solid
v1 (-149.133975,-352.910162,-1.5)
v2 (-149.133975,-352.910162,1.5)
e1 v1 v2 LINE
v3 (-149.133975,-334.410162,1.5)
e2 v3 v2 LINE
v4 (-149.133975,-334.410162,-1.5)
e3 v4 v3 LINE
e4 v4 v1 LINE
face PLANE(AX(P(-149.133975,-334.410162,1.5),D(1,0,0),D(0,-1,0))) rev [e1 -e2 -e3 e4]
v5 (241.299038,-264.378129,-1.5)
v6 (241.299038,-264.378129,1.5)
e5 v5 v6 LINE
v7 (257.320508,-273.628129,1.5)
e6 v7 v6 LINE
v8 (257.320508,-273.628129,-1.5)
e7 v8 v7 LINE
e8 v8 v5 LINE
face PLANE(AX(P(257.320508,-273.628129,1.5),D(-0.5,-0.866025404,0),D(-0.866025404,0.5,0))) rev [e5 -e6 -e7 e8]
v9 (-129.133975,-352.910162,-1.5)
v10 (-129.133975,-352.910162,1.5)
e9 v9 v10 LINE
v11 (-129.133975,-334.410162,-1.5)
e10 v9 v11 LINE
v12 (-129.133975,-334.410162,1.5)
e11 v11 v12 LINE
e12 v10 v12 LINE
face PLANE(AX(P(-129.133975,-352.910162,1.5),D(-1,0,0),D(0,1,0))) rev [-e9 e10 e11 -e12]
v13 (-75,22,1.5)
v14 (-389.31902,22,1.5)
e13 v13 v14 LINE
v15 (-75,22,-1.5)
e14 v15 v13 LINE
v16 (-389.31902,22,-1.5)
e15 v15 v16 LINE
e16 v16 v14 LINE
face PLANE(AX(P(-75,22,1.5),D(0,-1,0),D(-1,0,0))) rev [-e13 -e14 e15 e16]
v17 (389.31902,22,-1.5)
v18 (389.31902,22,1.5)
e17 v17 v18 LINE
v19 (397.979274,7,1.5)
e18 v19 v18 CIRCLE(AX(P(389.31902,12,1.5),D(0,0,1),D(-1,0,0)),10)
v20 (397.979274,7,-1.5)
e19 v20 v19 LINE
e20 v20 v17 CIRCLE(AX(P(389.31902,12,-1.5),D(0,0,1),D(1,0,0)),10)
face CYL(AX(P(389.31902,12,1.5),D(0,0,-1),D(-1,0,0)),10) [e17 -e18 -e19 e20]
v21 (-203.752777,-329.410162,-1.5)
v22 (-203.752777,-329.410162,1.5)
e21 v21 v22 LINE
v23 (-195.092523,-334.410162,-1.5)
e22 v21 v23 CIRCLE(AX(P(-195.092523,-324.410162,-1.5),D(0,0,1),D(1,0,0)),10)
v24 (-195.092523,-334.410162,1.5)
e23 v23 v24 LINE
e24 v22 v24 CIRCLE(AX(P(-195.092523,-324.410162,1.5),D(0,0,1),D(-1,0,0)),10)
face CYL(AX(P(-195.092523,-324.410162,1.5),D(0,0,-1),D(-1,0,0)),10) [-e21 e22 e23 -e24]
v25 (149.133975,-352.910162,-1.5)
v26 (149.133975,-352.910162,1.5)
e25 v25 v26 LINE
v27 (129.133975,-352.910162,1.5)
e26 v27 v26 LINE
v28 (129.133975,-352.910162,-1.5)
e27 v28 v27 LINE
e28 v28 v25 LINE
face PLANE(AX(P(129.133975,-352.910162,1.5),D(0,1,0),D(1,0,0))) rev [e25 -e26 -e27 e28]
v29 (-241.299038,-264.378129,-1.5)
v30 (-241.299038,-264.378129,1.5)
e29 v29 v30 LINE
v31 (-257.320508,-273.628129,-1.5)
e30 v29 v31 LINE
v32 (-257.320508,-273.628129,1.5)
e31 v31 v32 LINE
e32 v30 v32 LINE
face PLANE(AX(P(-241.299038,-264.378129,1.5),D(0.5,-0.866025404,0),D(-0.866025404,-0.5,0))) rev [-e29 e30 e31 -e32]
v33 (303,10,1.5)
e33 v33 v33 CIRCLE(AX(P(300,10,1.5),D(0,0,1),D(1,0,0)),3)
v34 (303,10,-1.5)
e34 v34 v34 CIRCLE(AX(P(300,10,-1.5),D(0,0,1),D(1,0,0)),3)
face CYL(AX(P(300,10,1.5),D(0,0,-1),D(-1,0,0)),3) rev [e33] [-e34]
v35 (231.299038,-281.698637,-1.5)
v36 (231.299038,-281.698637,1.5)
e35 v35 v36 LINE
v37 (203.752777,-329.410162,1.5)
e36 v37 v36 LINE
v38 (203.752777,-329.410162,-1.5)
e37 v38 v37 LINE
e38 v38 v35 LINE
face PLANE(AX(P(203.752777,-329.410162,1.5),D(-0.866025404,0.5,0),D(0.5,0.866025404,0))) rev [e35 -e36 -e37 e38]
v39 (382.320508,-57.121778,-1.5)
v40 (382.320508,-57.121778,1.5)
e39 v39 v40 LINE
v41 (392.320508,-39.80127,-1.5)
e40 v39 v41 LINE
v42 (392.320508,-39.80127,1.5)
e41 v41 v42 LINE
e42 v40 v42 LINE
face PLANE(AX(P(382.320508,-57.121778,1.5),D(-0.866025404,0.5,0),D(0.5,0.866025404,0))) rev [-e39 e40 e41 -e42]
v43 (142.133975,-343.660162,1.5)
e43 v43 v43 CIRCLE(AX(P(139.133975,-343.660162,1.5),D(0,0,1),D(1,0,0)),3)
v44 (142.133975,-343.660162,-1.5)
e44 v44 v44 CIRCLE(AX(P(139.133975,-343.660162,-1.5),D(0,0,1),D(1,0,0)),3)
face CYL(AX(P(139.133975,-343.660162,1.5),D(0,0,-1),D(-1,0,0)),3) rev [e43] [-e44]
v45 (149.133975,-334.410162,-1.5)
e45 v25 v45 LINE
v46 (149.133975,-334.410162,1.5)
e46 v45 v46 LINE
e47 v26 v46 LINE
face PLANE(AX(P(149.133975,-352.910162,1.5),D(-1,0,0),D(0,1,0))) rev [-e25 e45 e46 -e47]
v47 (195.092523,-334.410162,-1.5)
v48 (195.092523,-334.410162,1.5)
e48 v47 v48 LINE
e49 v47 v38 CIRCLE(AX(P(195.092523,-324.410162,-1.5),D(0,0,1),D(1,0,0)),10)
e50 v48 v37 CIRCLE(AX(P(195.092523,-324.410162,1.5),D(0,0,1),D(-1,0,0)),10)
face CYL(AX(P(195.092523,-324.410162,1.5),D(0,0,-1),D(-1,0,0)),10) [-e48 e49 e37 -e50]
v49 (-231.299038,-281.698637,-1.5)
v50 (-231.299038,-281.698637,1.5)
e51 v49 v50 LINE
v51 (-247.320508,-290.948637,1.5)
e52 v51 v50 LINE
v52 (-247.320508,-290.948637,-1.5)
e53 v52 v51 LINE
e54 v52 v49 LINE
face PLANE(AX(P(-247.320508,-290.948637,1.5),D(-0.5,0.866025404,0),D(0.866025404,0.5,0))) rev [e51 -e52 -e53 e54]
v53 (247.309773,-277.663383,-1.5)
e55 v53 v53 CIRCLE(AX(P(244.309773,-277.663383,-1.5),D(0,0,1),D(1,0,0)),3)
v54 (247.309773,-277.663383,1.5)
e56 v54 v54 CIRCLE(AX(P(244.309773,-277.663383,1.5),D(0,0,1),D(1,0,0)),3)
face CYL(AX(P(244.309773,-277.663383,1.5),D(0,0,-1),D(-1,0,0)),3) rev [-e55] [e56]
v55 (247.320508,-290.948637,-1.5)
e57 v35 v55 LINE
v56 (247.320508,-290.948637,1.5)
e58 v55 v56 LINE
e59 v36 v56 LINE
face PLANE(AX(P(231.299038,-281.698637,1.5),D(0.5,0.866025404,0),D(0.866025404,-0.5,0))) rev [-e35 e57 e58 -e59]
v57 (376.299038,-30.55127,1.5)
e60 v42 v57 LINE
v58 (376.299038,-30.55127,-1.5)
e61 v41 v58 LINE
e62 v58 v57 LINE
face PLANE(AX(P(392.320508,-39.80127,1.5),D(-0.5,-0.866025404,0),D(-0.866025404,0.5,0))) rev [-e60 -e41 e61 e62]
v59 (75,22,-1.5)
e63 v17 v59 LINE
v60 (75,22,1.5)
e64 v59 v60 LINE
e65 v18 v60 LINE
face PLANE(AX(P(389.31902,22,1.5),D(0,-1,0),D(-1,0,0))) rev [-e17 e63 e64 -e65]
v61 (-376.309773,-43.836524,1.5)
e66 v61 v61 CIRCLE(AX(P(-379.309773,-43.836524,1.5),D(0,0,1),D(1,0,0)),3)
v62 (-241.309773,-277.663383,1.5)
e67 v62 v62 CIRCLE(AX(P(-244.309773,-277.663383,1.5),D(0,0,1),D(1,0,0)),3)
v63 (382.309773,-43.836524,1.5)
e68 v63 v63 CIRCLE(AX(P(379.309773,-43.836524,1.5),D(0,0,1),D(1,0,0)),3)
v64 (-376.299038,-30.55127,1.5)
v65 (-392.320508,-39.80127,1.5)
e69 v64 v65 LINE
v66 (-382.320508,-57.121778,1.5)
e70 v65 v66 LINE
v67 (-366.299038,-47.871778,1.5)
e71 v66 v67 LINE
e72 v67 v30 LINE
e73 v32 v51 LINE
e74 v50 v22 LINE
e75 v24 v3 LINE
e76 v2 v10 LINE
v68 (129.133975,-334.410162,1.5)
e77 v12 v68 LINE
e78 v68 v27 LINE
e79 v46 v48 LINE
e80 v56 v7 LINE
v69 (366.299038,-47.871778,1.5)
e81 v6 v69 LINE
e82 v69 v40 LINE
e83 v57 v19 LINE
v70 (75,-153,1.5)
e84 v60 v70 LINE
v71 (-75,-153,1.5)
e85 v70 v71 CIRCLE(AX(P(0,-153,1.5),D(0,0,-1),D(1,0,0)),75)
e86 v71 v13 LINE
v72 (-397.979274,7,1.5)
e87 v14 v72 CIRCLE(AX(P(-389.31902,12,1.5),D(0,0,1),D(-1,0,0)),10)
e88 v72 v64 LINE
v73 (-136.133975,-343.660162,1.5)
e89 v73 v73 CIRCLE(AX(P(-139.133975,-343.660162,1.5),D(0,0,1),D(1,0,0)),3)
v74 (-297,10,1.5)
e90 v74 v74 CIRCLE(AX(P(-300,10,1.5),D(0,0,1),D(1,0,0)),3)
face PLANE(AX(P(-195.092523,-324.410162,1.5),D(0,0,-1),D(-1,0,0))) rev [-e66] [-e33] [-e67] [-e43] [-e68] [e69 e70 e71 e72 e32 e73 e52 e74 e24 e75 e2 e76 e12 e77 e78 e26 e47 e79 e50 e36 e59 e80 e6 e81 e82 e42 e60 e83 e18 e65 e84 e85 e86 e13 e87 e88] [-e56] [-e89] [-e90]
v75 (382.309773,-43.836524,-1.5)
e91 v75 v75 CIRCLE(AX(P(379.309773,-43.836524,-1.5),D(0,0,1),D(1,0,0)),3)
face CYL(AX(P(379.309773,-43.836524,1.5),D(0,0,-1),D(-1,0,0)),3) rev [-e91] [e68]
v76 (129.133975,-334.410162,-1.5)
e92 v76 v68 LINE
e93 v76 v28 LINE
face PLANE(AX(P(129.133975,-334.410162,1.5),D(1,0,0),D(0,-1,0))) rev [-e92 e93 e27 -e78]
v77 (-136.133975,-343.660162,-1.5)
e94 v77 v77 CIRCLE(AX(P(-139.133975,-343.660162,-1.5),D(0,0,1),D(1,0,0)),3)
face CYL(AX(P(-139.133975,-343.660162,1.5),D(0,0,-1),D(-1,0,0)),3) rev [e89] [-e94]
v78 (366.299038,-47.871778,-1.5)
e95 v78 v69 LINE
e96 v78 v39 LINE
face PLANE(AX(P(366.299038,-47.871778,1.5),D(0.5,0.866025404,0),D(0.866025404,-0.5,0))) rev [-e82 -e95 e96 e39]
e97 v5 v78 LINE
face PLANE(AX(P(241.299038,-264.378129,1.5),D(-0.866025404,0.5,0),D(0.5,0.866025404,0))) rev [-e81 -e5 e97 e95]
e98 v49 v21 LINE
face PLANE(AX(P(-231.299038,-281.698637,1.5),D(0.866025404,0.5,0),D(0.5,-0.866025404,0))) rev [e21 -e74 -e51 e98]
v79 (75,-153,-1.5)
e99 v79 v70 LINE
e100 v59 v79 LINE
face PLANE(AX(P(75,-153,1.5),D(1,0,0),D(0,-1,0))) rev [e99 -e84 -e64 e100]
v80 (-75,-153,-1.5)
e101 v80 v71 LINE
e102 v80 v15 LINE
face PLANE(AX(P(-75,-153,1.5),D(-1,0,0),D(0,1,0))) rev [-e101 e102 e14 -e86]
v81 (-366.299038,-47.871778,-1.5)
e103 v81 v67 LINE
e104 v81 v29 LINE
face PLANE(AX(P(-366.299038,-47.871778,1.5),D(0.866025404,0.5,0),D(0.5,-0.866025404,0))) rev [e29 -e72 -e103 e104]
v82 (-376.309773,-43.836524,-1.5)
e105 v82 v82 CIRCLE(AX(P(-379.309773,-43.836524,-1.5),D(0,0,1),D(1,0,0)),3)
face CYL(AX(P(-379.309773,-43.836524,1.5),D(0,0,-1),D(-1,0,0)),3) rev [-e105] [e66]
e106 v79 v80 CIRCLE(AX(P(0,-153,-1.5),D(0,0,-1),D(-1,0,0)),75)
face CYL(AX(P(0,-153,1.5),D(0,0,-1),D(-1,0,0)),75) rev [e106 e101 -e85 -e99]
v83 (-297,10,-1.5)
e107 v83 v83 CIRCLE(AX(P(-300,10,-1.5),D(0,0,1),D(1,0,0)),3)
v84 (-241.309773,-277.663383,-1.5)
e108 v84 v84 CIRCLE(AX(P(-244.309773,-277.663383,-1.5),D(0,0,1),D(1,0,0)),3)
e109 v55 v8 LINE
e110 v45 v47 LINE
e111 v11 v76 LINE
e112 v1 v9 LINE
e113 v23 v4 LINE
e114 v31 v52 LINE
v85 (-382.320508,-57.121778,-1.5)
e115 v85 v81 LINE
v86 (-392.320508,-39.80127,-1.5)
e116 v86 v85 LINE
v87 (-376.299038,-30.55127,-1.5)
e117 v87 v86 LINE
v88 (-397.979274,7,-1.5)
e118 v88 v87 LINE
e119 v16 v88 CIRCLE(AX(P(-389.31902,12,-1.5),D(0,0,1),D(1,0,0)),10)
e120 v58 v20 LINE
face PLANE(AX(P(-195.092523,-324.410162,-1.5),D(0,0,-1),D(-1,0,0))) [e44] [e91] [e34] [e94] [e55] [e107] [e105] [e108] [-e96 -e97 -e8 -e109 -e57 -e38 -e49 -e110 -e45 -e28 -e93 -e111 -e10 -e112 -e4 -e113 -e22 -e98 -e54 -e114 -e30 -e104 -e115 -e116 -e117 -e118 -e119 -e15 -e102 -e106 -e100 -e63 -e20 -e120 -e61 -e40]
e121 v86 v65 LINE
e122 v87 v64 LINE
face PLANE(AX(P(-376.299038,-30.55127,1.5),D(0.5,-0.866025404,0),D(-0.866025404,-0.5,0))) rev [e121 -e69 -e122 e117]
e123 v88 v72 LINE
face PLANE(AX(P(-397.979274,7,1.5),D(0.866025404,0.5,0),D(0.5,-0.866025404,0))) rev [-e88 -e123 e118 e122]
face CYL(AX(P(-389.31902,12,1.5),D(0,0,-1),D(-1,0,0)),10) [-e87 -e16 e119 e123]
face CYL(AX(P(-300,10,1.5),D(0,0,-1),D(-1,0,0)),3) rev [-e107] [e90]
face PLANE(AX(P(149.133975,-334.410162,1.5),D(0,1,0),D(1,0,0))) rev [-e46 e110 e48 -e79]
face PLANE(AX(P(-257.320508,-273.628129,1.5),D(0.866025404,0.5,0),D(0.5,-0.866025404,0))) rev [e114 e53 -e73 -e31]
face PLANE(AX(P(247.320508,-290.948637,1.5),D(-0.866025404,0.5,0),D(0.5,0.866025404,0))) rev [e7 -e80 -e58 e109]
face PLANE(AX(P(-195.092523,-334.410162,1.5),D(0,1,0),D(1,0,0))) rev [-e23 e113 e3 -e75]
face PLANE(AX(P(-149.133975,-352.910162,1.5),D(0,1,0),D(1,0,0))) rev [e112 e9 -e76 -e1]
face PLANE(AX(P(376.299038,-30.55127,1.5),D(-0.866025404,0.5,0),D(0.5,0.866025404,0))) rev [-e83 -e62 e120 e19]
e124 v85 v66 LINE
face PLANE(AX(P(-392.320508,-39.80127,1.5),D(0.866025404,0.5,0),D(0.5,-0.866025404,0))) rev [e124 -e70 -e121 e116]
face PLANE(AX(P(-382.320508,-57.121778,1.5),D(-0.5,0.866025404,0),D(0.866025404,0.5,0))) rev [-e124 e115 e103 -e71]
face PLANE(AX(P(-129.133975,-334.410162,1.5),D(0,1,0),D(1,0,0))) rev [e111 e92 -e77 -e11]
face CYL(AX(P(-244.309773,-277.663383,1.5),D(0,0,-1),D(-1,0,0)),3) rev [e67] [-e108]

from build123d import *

# Parameters (mm, degrees)
SKETCH_1_R              = 3
EXTRUDE_1_DEPTH         = 1.5
SHEET_START             = -1.5
SHEET_METAL_1_OUTLINE_R = 3
SHEET_METAL_1_DEPTH     = 1.5


# Read off the part's stored shape, not the designer's step: Преобразовать-Твердое тело1
with BuildPart() as part:
    # Sketch 1 → Бобышка-Вытянуть1 (new body)
    with BuildSketch(Plane.XY):
        with BuildLine():
            Line((389.31902002, 22), (75, 22))
            Line((75, 22), (75, -153))
            ThreePointArc((75, -153), (0, -228), (-75, -153))
            Line((-75, -153), (-75, 22))
            Line((-75, 22), (-389.31902002, 22))
            ThreePointArc((-389.31902002, 22), (-397.979274058, 17), (-397.979274058, 7))
            Line((-397.979274058, 7), (-376.299038106, -30.551270189))
            Line((-376.299038106, -30.551270189), (-392.320508076, -39.801270189))
            Line((-392.320508076, -39.801270189), (-382.320508076, -57.121778265))
            Line((-382.320508076, -57.121778265), (-366.299038106, -47.871778265))
            Line((-366.299038106, -47.871778265), (-241.299038106, -264.378129211))
            Line((-241.299038106, -264.378129211), (-257.320508076, -273.628129211))
            Line((-257.320508076, -273.628129211), (-247.320508076, -290.948637287))
            Line((-247.320508076, -290.948637287), (-231.299038106, -281.698637287))
            Line((-231.299038106, -281.698637287), (-203.75277675, -329.410161514))
            ThreePointArc((-203.75277675, -329.410161514), (-200.092522712, -333.070415552), (-195.092522712, -334.410161514))
            Line((-195.092522712, -334.410161514), (-149.133974596, -334.410161514))
            Line((-149.133974596, -334.410161514), (-149.133974596, -352.910161514))
            Line((-149.133974596, -352.910161514), (-129.133974596, -352.910161514))
            Line((-129.133974596, -352.910161514), (-129.133974596, -334.410161514))
            Line((-129.133974596, -334.410161514), (129.133974596, -334.410161514))
            Line((129.133974596, -334.410161514), (129.133974596, -352.910161514))
            Line((129.133974596, -352.910161514), (149.133974596, -352.910161514))
            Line((149.133974596, -352.910161514), (149.133974596, -334.410161514))
            Line((149.133974596, -334.410161514), (195.092522712, -334.410161514))
            ThreePointArc((195.092522712, -334.410161514), (200.092522712, -333.070415552), (203.75277675, -329.410161514))
            Line((203.75277675, -329.410161514), (231.299038106, -281.698637287))
            Line((231.299038106, -281.698637287), (247.320508076, -290.948637287))
            Line((247.320508076, -290.948637287), (257.320508076, -273.628129211))
            Line((257.320508076, -273.628129211), (241.299038106, -264.378129211))
            Line((241.299038106, -264.378129211), (366.299038106, -47.871778265))
            Line((366.299038106, -47.871778265), (382.320508076, -57.121778265))
            Line((382.320508076, -57.121778265), (392.320508076, -39.801270189))
            Line((392.320508076, -39.801270189), (376.299038106, -30.551270189))
            Line((376.299038106, -30.551270189), (397.979274058, 7))
            ThreePointArc((397.979274058, 7), (397.979274058, 17), (389.31902002, 22))
        make_face()
        with Locations((244.309773091, -277.663383249)):
            Circle(SKETCH_1_R, mode=Mode.SUBTRACT)
        with Locations((379.309773091, -43.836524227)):
            Circle(SKETCH_1_R, mode=Mode.SUBTRACT)
        with Locations((139.133974596, -343.660161514)):
            Circle(SKETCH_1_R, mode=Mode.SUBTRACT)
        with Locations((-139.133974596, -343.660161514)):
            Circle(SKETCH_1_R, mode=Mode.SUBTRACT)
        with Locations((-244.309773091, -277.663383249)):
            Circle(SKETCH_1_R, mode=Mode.SUBTRACT)
        with Locations((-379.309773091, -43.836524227)):
            Circle(SKETCH_1_R, mode=Mode.SUBTRACT)
        with Locations((300, 10)):
            Circle(SKETCH_1_R, mode=Mode.SUBTRACT)
        with Locations((-300, 10)):
            Circle(SKETCH_1_R, mode=Mode.SUBTRACT)
    extrude(amount=EXTRUDE_1_DEPTH)

    # Sheet Metal 1 outline → Sheet Metal 1 (add)
    with BuildSketch(Plane.XY.offset(SHEET_START)):
        with BuildLine():
            Line((-149.133974596, -334.410161514), (-149.133974596, -352.910161514))
            Line((-149.133974596, -352.910161514), (-129.133974596, -352.910161514))
            Line((-129.133974596, -352.910161514), (-129.133974596, -334.410161514))
            Line((-129.133974596, -334.410161514), (129.133974596, -334.410161514))
            Line((129.133974596, -334.410161514), (129.133974596, -352.910161514))
            Line((129.133974596, -352.910161514), (149.133974596, -352.910161514))
            Line((149.133974596, -352.910161514), (149.133974596, -334.410161514))
            Line((149.133974596, -334.410161514), (195.092522712, -334.410161514))
            ThreePointArc((195.092522712, -334.410161514), (200.092522712, -333.070415552), (203.75277675, -329.410161514))
            Line((203.75277675, -329.410161514), (231.299038106, -281.698637287))
            Line((231.299038106, -281.698637287), (247.320508076, -290.948637287))
            Line((247.320508076, -290.948637287), (257.320508076, -273.628129211))
            Line((257.320508076, -273.628129211), (241.299038106, -264.378129211))
            Line((241.299038106, -264.378129211), (366.299038106, -47.871778265))
            Line((366.299038106, -47.871778265), (382.320508076, -57.121778265))
            Line((382.320508076, -57.121778265), (392.320508076, -39.801270189))
            Line((392.320508076, -39.801270189), (376.299038106, -30.551270189))
            Line((376.299038106, -30.551270189), (397.979274058, 7))
            ThreePointArc((397.979274058, 7), (397.979274058, 17), (389.31902002, 22))
            Line((389.31902002, 22), (75, 22))
            Line((75, 22), (75, -153))
            ThreePointArc((75, -153), (0, -228), (-75, -153))
            Line((-75, -153), (-75, 22))
            Line((-75, 22), (-389.31902002, 22))
            ThreePointArc((-389.31902002, 22), (-397.979274058, 17), (-397.979274058, 7))
            Line((-397.979274058, 7), (-376.299038106, -30.551270189))
            Line((-376.299038106, -30.551270189), (-392.320508076, -39.801270189))
            Line((-392.320508076, -39.801270189), (-382.320508076, -57.121778265))
            Line((-382.320508076, -57.121778265), (-366.299038106, -47.871778265))
            Line((-366.299038106, -47.871778265), (-241.299038106, -264.378129211))
            Line((-241.299038106, -264.378129211), (-257.320508076, -273.628129211))
            Line((-257.320508076, -273.628129211), (-247.320508076, -290.948637287))
            Line((-247.320508076, -290.948637287), (-231.299038106, -281.698637287))
            Line((-231.299038106, -281.698637287), (-203.75277675, -329.410161514))
            ThreePointArc((-203.75277675, -329.410161514), (-200.092522712, -333.070415552), (-195.092522712, -334.410161514))
            Line((-195.092522712, -334.410161514), (-149.133974596, -334.410161514))
        make_face()
        with Locations((-244.309773091, -277.663383249)):
            Circle(SHEET_METAL_1_OUTLINE_R, mode=Mode.SUBTRACT)
        with Locations((-139.133974596, -343.660161514)):
            Circle(SHEET_METAL_1_OUTLINE_R, mode=Mode.SUBTRACT)
        with Locations((139.133974596, -343.660161514)):
            Circle(SHEET_METAL_1_OUTLINE_R, mode=Mode.SUBTRACT)
        with Locations((244.309773091, -277.663383249)):
            Circle(SHEET_METAL_1_OUTLINE_R, mode=Mode.SUBTRACT)
        with Locations((-379.309773091, -43.836524227)):
            Circle(SHEET_METAL_1_OUTLINE_R, mode=Mode.SUBTRACT)
        with Locations((-300, 10)):
            Circle(SHEET_METAL_1_OUTLINE_R, mode=Mode.SUBTRACT)
        with Locations((379.309773091, -43.836524227)):
            Circle(SHEET_METAL_1_OUTLINE_R, mode=Mode.SUBTRACT)
        with Locations((300, 10)):
            Circle(SHEET_METAL_1_OUTLINE_R, mode=Mode.SUBTRACT)
    extrude(amount=SHEET_METAL_1_DEPTH)


solid = part.part
